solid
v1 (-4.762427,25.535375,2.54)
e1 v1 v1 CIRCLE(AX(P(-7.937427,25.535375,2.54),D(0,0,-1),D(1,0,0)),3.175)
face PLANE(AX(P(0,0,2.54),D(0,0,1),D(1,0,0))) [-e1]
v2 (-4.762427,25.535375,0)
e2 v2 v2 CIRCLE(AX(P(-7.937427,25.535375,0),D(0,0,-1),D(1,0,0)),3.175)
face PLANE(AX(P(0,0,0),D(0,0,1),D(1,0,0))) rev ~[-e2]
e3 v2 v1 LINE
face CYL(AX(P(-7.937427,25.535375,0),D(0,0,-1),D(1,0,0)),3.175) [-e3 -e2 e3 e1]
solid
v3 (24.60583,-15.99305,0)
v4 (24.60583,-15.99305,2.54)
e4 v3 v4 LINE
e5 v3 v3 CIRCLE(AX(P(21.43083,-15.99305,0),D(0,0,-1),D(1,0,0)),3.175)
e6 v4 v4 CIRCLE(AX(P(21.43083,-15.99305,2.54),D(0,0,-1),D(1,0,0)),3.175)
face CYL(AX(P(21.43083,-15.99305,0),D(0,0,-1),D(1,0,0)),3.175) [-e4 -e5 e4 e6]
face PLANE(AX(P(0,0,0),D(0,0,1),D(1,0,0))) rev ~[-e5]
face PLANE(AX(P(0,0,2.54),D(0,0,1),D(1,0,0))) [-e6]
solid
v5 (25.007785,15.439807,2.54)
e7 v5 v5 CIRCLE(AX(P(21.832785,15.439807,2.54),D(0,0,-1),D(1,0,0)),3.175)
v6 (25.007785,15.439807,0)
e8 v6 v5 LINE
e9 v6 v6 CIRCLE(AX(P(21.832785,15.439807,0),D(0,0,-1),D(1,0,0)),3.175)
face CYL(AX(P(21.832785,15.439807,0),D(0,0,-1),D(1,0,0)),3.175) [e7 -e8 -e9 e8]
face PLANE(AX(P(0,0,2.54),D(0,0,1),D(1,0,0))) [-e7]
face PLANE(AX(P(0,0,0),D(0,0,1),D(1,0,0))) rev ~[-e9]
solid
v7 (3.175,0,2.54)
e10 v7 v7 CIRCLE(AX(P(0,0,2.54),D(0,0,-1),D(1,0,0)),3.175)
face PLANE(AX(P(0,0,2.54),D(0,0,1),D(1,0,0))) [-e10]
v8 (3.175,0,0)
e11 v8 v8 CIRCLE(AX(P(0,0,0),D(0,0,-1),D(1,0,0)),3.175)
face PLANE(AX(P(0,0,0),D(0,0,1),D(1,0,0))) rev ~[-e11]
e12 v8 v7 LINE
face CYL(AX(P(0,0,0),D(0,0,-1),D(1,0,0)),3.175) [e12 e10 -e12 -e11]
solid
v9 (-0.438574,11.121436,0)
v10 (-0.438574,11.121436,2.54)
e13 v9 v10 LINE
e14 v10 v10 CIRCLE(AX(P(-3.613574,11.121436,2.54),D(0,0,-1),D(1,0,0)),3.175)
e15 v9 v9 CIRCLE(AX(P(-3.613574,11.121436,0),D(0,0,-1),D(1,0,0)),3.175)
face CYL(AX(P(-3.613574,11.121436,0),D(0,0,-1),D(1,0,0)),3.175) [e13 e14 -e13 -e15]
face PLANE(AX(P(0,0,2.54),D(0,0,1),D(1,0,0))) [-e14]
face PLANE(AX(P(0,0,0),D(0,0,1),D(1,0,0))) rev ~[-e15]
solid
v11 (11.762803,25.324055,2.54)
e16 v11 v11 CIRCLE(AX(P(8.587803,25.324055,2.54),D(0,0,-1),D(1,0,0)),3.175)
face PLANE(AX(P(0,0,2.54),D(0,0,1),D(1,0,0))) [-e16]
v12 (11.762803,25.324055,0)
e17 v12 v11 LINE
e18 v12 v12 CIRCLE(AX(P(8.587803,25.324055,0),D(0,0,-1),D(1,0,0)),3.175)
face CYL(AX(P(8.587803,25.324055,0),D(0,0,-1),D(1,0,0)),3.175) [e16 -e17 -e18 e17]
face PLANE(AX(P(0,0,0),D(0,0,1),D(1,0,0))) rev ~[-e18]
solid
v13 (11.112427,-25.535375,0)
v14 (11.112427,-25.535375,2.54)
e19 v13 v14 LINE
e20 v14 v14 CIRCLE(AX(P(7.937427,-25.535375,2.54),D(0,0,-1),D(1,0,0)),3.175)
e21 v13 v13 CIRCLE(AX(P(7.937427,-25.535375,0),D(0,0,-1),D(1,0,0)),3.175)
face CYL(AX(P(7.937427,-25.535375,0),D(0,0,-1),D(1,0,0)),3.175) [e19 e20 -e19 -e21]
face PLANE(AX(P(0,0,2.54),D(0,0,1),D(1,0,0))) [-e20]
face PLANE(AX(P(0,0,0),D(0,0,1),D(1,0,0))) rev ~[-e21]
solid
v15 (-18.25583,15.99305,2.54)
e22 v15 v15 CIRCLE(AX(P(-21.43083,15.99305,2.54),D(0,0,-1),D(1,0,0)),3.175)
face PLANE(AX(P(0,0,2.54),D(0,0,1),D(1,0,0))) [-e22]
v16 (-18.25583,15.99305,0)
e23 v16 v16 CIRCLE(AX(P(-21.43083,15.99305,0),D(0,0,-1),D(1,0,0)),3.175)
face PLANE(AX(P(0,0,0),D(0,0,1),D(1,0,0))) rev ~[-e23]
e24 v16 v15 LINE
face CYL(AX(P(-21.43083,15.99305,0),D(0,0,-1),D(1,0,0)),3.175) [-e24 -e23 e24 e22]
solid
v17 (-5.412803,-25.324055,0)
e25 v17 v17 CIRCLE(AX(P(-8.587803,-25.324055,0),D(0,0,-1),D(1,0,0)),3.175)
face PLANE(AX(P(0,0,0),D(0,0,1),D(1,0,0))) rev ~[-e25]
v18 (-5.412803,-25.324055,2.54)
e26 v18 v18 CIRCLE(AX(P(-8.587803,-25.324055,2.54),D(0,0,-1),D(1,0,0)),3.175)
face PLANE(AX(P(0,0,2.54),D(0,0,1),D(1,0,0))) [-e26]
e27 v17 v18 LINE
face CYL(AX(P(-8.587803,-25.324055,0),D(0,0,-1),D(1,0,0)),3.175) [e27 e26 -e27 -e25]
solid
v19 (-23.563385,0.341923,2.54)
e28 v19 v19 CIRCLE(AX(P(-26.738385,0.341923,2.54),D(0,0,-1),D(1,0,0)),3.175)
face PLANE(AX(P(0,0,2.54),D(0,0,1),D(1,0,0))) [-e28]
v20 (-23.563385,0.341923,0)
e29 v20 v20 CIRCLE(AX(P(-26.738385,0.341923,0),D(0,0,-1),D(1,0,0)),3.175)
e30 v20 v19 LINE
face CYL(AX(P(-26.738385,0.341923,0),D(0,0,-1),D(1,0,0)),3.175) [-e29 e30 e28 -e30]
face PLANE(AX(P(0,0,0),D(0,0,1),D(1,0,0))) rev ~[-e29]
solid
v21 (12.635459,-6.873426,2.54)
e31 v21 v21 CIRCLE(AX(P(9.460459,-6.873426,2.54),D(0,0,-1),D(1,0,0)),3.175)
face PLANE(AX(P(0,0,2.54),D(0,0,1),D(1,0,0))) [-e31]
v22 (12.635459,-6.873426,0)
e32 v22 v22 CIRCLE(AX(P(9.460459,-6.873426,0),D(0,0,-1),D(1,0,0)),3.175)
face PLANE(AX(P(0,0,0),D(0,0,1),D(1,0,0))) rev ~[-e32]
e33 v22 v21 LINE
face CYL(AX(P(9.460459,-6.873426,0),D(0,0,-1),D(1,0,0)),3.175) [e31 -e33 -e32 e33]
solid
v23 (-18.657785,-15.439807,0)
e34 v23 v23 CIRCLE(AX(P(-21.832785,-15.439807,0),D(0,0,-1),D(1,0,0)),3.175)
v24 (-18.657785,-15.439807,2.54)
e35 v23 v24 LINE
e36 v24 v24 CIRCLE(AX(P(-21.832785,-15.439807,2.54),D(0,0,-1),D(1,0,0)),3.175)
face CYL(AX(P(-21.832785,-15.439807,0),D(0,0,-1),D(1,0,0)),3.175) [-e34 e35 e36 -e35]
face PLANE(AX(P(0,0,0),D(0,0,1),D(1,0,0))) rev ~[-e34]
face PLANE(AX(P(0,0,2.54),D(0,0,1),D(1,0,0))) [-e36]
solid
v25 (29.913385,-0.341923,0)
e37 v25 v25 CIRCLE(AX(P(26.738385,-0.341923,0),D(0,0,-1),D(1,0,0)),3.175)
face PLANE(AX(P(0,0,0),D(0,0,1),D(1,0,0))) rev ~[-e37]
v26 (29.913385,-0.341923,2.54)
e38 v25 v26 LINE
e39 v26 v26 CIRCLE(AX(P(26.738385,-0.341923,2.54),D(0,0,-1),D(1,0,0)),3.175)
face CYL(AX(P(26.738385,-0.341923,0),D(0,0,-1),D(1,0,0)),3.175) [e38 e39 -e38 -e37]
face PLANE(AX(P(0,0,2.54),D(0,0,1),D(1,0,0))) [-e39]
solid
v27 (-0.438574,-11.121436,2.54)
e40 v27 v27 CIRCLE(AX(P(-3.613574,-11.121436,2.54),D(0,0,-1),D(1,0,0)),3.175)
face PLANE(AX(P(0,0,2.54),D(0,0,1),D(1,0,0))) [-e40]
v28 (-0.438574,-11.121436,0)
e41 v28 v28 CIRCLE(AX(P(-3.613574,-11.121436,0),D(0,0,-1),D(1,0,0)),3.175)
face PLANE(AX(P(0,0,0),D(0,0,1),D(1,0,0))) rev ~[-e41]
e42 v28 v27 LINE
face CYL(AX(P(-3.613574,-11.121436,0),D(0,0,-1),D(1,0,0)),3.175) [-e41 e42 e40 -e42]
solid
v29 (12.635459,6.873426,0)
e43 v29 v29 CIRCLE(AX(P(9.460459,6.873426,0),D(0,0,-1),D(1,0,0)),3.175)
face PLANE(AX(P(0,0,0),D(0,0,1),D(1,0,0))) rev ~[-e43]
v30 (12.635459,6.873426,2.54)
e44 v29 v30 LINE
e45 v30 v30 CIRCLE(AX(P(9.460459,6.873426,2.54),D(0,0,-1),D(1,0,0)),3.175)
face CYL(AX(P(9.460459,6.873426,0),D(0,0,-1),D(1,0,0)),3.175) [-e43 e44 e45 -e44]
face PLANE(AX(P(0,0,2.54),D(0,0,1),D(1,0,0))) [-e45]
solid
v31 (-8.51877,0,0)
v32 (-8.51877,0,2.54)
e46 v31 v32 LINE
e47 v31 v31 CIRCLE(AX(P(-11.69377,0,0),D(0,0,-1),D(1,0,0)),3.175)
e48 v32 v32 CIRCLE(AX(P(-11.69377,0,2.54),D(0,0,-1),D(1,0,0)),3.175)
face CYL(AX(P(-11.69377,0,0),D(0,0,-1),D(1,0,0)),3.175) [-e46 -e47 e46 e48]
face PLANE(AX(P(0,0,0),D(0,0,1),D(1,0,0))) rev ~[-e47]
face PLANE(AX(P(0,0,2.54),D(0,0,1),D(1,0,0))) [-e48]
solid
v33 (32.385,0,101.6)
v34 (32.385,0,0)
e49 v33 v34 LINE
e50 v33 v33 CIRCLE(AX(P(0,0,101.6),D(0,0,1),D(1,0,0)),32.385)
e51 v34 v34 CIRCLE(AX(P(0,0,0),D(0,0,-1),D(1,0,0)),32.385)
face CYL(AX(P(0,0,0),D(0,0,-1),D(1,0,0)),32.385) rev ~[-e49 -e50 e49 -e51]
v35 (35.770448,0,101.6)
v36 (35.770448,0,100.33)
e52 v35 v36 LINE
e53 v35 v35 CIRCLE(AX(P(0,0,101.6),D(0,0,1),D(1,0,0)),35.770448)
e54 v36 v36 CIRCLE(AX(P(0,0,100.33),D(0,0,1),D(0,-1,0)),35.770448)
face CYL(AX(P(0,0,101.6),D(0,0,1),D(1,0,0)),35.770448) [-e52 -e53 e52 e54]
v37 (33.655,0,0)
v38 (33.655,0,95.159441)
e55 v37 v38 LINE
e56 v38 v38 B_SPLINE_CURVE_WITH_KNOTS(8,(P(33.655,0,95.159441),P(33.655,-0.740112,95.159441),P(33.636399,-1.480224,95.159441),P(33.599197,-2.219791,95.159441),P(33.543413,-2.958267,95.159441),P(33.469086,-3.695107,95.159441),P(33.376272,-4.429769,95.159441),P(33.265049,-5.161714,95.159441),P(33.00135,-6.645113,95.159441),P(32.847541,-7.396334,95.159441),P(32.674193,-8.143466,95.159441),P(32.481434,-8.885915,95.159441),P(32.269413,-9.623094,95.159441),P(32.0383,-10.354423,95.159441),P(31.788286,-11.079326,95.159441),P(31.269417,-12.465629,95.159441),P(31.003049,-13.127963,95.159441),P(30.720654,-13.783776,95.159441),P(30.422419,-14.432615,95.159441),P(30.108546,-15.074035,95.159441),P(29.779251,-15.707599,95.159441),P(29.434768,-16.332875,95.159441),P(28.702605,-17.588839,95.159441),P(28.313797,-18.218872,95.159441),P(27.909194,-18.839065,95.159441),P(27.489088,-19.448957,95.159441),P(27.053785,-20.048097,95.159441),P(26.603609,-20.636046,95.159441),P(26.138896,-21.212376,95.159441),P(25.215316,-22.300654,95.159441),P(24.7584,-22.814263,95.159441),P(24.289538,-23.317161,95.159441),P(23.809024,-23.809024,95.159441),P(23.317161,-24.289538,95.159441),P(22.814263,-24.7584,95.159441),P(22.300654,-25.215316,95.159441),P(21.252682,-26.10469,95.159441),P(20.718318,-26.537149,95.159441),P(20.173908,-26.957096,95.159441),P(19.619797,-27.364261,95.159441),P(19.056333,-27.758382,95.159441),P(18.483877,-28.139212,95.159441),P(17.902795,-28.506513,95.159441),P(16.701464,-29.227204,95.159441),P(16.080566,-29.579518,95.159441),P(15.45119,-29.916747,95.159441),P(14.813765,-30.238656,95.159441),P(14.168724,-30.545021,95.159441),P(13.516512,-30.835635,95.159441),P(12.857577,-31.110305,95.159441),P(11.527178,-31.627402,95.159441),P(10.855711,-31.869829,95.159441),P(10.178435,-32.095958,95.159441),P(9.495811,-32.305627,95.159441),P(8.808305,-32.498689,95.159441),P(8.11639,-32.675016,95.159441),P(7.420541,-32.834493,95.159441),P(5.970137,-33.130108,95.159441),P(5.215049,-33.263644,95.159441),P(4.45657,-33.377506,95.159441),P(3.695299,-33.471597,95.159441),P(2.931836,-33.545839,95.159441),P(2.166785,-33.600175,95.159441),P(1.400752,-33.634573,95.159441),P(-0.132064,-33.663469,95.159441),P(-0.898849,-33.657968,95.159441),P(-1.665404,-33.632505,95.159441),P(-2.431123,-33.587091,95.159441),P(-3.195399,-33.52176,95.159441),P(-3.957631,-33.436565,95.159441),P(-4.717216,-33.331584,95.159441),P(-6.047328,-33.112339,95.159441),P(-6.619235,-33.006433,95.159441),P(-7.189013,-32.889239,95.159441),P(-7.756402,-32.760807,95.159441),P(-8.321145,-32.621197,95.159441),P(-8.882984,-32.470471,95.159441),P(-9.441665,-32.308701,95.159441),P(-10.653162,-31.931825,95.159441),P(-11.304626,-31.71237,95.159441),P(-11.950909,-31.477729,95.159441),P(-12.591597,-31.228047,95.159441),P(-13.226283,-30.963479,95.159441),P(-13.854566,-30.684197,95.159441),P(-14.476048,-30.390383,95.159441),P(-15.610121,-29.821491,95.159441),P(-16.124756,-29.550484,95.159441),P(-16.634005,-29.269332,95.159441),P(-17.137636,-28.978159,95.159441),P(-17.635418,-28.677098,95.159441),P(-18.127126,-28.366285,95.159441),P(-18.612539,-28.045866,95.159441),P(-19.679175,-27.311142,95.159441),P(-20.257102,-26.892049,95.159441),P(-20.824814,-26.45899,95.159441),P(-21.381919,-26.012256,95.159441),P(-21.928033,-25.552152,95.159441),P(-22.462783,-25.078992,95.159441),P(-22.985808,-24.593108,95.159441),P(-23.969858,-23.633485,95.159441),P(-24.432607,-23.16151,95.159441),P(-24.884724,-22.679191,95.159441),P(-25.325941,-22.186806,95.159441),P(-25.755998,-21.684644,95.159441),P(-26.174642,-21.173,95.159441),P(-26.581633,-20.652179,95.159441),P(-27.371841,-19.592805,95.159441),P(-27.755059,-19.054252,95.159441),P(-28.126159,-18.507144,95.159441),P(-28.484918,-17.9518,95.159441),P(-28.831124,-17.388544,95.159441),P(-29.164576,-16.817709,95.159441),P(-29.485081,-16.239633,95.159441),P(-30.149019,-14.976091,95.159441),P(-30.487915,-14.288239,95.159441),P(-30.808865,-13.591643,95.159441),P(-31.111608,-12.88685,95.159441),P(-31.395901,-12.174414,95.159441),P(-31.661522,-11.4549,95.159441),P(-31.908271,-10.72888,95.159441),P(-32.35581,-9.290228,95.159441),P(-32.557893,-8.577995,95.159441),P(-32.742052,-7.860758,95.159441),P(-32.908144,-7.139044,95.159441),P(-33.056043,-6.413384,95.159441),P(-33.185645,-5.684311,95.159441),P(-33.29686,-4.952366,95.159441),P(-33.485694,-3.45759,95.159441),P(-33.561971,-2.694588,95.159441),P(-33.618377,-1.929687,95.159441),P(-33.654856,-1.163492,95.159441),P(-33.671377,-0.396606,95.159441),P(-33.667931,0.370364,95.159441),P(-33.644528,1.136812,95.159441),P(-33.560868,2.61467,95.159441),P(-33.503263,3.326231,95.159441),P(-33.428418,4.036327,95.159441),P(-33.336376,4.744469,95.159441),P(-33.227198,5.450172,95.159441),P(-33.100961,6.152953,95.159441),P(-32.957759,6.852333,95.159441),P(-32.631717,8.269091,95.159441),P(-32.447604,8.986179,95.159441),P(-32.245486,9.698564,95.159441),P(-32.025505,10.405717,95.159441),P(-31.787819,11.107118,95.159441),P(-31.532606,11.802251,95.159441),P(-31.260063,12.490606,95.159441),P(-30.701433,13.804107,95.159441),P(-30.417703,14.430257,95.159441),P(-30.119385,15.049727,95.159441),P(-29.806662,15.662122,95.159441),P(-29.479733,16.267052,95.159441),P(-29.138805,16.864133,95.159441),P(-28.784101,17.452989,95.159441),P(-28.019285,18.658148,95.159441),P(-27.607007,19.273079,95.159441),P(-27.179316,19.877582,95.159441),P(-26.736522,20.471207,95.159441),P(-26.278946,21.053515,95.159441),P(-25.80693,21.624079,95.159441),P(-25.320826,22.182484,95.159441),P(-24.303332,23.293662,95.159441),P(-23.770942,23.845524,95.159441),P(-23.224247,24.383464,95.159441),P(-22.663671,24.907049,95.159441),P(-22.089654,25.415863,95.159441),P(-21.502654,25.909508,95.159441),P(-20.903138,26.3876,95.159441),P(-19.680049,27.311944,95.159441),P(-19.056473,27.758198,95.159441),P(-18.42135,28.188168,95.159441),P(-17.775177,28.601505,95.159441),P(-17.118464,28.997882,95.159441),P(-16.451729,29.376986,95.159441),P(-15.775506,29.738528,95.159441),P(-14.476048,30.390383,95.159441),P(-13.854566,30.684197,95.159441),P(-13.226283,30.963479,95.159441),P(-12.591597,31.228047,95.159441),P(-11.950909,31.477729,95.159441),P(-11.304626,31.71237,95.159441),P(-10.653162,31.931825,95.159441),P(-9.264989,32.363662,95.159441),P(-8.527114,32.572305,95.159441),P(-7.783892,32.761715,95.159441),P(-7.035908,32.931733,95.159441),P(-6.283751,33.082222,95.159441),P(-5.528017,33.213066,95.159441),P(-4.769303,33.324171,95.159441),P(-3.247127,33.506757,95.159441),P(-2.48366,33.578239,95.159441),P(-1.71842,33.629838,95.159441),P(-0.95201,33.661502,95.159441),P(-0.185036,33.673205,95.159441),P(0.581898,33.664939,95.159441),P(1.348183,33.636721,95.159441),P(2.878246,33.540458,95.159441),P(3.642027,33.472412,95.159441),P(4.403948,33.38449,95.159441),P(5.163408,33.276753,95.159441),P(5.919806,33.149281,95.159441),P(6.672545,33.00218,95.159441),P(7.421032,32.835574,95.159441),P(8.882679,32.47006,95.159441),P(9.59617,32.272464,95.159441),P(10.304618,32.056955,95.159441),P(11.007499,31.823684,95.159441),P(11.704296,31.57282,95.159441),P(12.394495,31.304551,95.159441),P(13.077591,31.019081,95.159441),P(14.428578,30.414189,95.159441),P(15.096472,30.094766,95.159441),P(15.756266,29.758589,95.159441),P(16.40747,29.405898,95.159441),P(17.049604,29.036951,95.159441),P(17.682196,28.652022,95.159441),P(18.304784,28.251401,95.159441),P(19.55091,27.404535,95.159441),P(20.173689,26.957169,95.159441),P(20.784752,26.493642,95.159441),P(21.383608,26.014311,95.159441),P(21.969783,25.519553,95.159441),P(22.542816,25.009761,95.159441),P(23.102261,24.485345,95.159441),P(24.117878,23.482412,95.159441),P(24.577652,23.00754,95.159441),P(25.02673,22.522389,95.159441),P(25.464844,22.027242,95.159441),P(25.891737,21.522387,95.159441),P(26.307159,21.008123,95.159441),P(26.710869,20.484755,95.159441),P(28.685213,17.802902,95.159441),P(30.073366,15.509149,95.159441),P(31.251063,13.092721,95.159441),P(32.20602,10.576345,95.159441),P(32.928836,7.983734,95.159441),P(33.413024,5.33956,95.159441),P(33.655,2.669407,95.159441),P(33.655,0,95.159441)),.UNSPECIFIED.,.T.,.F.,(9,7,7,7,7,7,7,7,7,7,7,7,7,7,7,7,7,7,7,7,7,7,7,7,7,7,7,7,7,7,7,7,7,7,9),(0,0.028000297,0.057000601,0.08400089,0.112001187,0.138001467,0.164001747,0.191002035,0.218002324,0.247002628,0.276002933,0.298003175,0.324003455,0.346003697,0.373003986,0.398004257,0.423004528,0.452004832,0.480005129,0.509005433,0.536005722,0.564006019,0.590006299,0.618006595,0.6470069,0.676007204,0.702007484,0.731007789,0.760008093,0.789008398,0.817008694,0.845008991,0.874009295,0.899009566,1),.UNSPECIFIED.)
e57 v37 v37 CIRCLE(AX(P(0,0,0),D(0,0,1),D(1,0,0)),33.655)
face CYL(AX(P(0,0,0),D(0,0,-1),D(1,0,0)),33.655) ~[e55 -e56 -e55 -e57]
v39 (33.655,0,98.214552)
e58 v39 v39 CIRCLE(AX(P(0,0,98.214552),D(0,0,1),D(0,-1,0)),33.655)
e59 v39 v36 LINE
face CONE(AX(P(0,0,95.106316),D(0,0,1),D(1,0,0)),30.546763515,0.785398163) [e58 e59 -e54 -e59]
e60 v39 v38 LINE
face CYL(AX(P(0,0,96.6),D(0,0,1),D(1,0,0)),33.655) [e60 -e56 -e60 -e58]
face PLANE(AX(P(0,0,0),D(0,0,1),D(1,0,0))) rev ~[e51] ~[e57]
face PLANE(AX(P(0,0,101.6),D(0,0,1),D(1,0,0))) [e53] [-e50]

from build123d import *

# Parameters (mm, degrees)
F0_R        = 33.655
F0_R_2      = 32.385
F1_DEPTH    = 101.6
F2_R        = 33.3089939783
F3_DEPTH    = 2.54
F4_R        = 32.385
F4_R_2      = 3.175
F5_DEPTH    = 25.4
F6_R        = 35.7704476133
F6_R_2      = 33.0207785817
F7_DEPTH    = 6.35
F8_S5_R     = 33.655
F8_T6_DEPTH = 85


# Not quite as in the source:
# - a fillet or chamfer that OpenCascade refuses, or shapes differently, is made with other operations: its cross-section is extruded or revolved along the edge and cut away or added


with BuildPart() as f1:
    # F0 (on Top) → F1 (new body)
    with BuildSketch(Plane.XY):
        Circle(F0_R)
        Circle(F0_R_2, mode=Mode.SUBTRACT)
    extrude(amount=F1_DEPTH)

    # F2 (on Top) → F3 (join)
    with BuildSketch(Plane.XY):
        Circle(F2_R)
    extrude(amount=F3_DEPTH)

    # F4 (on face) → F5 (cut)
    with BuildSketch(Plane(origin=(0, 0, 0), x_dir=(1, 0, 0), z_dir=(0, 0, -1))):
        Circle(F4_R)
        with Locations((-7.9374271012, -25.5353750872)):
            Circle(F4_R_2, mode=Mode.SUBTRACT)
        with Locations((-21.4308303044, -15.993049812)):
            Circle(F4_R_2, mode=Mode.SUBTRACT)
        with Locations((-26.7383847386, -0.3419230925)):
            Circle(F4_R_2, mode=Mode.SUBTRACT)
        with Locations((-3.6135736787, -11.1214362212)):
            Circle(F4_R_2, mode=Mode.SUBTRACT)
        with Locations((8.5878034715, -25.3240549945)):
            Circle(F4_R_2, mode=Mode.SUBTRACT)
        with Locations((9.4604587116, -6.8734255884)):
            Circle(F4_R_2, mode=Mode.SUBTRACT)
        with Locations((21.8327850068, -15.4398066269)):
            Circle(F4_R_2, mode=Mode.SUBTRACT)
        with Locations((-21.8327850068, 15.4398066269)):
            Circle(F4_R_2, mode=Mode.SUBTRACT)
        with Locations((-11.6937700659, 0)):
            Circle(F4_R_2, mode=Mode.SUBTRACT)
        with Locations((-3.6135736787, 11.1214362212)):
            Circle(F4_R_2, mode=Mode.SUBTRACT)
        with Locations((-8.5878034715, 25.3240549945)):
            Circle(F4_R_2, mode=Mode.SUBTRACT)
        Circle(F4_R_2, mode=Mode.SUBTRACT)
        with Locations((9.4604587116, 6.8734255884)):
            Circle(F4_R_2, mode=Mode.SUBTRACT)
        with Locations((26.7383847386, 0.3419230925)):
            Circle(F4_R_2, mode=Mode.SUBTRACT)
        with Locations((21.4308303044, 15.993049812)):
            Circle(F4_R_2, mode=Mode.SUBTRACT)
        with Locations((7.9374271012, 25.5353750872)):
            Circle(F4_R_2, mode=Mode.SUBTRACT)
    extrude(amount=-F5_DEPTH, mode=Mode.SUBTRACT)

    # F6 (on face) → F7 (join)
    with BuildSketch(Plane.XY.offset(101.6)):
        Circle(F6_R)
        Circle(F6_R_2, mode=Mode.SUBTRACT)
    extrude(amount=-F7_DEPTH)

    # F8: chamfer of 5.08 on 1 edges, made by hand


with BuildPart() as f8_tool2:
    # F8_s3 → F8_t4 (revolve)
    with BuildSketch(Plane.XZ):
        with BuildLine():
            Line((30.5467635153, 95.1063159021), (35.9141317112, 100.4736840979))
            Line((35.9141317112, 100.4736840979), (36.0157317112, 100.4736840979))
            ThreePointArc((36.0157317112, 100.4736840979), (35.8720476133, 97.861842049), (35.8720476133, 95.25))
            Line((35.8720476133, 95.25), (35.7704476133, 95.1484))
            ThreePointArc((35.7704476133, 95.1484), (33.1586055643, 95.1484), (30.5467635153, 95.0047159021))
            Line((30.5467635153, 95.0047159021), (30.5467635153, 95.1063159021))
        make_face()
    revolve(axis=Axis((0, 0, 95.25), (0, 0, 1)))

    # F8_s5 → F8_t6 (cut, symmetric)
    with BuildSketch(Plane.XY.offset(96.6)):
        Circle(F8_S5_R)
    extrude(amount=F8_T6_DEPTH, both=True, mode=Mode.SUBTRACT)


with BuildPart() as f1_1:
    add(f1.part)

    # F8_t1: cut F8_tool2
    add(f8_tool2.part, mode=Mode.SUBTRACT)


solid = f1_1.part
